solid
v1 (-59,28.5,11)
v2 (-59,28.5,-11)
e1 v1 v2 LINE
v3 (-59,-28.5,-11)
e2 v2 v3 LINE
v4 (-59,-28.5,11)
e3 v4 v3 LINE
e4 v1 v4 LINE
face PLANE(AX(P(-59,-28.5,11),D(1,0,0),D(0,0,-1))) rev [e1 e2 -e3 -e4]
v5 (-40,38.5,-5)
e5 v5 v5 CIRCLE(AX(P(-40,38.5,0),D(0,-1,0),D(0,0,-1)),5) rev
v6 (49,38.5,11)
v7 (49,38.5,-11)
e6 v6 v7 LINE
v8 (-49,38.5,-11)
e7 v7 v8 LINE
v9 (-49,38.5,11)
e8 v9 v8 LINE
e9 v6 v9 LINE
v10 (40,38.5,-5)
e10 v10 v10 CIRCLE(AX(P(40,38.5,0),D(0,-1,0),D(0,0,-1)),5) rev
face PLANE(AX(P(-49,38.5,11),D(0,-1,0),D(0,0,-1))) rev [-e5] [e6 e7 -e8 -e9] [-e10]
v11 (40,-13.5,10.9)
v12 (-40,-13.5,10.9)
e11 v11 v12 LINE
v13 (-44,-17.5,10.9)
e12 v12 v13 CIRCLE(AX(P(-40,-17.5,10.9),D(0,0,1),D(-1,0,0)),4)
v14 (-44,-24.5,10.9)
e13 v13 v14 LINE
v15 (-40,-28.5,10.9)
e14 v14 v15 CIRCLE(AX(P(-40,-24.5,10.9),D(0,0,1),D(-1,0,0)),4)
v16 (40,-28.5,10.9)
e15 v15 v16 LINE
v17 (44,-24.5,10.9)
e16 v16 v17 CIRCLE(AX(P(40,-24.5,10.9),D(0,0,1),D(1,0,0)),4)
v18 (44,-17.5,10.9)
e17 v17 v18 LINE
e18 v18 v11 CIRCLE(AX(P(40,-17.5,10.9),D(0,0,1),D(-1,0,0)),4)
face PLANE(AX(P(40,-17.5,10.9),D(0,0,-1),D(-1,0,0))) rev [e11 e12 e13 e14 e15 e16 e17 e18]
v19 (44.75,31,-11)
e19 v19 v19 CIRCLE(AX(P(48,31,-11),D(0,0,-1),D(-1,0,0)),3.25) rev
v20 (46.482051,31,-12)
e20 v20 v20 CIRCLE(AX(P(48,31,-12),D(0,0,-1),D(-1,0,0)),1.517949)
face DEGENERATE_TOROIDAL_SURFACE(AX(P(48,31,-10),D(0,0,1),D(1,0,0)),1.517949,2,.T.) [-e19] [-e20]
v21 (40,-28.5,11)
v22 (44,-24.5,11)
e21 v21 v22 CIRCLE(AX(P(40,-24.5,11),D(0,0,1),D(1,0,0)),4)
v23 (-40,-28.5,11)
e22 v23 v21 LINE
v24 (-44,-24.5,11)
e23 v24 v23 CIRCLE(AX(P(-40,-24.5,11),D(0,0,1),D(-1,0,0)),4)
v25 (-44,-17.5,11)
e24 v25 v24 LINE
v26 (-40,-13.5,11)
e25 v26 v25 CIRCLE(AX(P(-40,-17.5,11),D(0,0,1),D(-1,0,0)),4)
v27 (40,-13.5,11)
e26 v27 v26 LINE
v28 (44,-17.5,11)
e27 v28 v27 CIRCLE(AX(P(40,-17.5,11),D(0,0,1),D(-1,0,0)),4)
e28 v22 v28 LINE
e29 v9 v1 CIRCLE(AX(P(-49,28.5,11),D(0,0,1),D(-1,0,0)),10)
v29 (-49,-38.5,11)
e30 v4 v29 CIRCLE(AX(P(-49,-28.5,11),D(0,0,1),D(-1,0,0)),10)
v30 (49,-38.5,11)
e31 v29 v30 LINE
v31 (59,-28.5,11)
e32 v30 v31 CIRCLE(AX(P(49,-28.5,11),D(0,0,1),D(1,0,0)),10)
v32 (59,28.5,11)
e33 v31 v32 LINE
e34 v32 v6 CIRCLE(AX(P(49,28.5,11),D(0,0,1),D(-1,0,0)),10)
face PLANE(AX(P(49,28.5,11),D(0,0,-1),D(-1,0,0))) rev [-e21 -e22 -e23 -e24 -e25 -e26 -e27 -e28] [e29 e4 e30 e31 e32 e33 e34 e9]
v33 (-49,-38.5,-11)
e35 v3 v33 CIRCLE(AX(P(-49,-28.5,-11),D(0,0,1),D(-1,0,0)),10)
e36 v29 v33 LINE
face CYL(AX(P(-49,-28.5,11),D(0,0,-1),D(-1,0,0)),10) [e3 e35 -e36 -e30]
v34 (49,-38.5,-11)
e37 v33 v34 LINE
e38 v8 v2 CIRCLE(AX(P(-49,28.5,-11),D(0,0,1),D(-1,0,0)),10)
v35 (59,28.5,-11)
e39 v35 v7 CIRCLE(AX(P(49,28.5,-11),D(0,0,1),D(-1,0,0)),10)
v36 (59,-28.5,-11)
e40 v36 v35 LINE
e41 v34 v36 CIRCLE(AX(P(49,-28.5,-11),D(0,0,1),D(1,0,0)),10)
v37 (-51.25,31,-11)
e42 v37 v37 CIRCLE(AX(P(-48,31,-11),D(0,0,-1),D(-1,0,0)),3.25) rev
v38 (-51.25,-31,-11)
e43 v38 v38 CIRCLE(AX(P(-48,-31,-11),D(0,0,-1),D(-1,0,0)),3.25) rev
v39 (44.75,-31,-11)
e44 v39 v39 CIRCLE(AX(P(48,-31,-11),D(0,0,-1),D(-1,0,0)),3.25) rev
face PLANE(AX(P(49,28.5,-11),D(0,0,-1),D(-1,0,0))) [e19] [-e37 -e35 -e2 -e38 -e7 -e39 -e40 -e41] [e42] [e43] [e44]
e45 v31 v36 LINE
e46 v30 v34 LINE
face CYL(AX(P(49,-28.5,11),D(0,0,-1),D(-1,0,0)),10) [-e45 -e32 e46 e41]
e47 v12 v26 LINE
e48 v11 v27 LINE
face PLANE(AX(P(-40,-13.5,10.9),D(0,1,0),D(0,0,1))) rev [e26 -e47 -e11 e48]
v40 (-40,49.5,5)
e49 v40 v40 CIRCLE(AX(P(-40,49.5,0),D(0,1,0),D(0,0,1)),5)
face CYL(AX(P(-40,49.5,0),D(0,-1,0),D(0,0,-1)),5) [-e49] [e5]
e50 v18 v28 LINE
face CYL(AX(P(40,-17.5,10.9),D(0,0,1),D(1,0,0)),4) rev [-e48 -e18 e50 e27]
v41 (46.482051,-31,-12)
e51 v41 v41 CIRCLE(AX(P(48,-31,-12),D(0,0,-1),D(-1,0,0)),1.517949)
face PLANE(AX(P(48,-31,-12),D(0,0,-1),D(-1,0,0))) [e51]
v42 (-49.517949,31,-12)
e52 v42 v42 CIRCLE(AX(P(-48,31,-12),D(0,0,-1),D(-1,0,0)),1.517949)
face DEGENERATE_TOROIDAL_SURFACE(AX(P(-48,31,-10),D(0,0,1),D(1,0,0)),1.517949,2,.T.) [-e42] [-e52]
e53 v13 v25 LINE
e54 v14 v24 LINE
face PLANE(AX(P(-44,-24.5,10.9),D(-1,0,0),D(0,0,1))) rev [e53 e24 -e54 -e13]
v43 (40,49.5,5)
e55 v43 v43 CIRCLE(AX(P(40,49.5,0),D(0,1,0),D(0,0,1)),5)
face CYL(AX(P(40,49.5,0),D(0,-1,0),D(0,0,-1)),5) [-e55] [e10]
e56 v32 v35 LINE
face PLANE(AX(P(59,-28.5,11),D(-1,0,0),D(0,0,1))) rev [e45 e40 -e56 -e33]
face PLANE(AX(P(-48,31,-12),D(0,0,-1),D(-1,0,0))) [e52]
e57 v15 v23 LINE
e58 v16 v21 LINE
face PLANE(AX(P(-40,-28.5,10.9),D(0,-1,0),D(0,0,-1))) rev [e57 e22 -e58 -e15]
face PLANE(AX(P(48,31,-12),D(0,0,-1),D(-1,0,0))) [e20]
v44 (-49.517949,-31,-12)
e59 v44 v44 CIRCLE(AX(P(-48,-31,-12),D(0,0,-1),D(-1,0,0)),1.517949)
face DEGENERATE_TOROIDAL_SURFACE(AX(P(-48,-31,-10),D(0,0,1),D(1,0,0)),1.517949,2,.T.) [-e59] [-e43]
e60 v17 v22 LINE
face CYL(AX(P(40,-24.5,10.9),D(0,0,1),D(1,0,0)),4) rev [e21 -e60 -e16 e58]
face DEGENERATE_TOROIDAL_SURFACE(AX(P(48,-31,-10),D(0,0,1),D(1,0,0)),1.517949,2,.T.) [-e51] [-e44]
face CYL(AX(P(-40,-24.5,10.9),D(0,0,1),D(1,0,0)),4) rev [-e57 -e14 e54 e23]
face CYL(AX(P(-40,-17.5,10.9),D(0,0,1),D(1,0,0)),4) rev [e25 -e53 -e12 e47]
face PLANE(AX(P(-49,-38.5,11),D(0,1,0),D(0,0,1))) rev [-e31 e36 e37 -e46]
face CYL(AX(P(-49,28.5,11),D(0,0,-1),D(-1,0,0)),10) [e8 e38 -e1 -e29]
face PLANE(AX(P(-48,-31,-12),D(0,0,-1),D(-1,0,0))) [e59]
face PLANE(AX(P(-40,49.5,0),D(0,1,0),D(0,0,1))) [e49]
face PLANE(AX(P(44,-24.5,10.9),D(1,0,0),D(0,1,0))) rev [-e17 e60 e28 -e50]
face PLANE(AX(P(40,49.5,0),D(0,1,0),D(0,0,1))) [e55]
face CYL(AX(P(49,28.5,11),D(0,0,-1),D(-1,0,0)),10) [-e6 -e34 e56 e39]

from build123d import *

# Parameters (mm, degrees)
BOSS_EXTRUDE1_DEPTH = 11
SKETCH2_R           = 5
BOSS_EXTRUDE2_DEPTH = 11
SKETCH3_R           = 3.25
BOSS_EXTRUDE3_DEPTH = 1
FILLET1_R           = 2
CUT_EXTRUDE1_DEPTH  = 0.1


with BuildPart() as part:
    # Sketch1 → Boss-Extrude1 (new, symmetric)
    with BuildSketch(Plane.XY):
        with BuildLine():
            Line((-49, -38.5), (49, -38.5))
            ThreePointArc((49, -38.5), (56.071067812, -35.571067812), (59, -28.5))
            Line((59, -28.5), (59, 28.5))
            ThreePointArc((59, 28.5), (56.071067812, 35.571067812), (49, 38.5))
            Line((49, 38.5), (-49, 38.5))
            ThreePointArc((-49, 38.5), (-56.071067812, 35.571067812), (-59, 28.5))
            Line((-59, 28.5), (-59, -28.5))
            ThreePointArc((-59, -28.5), (-56.071067812, -35.571067812), (-49, -38.5))
        make_face()
    extrude(amount=BOSS_EXTRUDE1_DEPTH, both=True)

    # Sketch2 → Boss-Extrude2 (add, symmetric)
    with BuildSketch(Plane(origin=(0, 38.5, 0), x_dir=(1, 0, 0), z_dir=(0, 1, 0))):
        with Locations(Location((-40, 0, 0), (0, 0, 90))):
            Circle(SKETCH2_R)
        with Locations(Location((40, 0, 0), (0, 0, 90))):
            Circle(SKETCH2_R)
    extrude(amount=BOSS_EXTRUDE2_DEPTH, both=True)

    # Sketch3 → Boss-Extrude3 (add, symmetric)
    with BuildSketch(Plane(origin=(0, 0, -11), x_dir=(-1, 0, 0), z_dir=(0, 0, -1))):
        with Locations((-48, 31)):
            Circle(SKETCH3_R)
        with Locations((-48, -31)):
            Circle(SKETCH3_R)
        with Locations((48, -31)):
            Circle(SKETCH3_R)
        with Locations((48, 31)):
            Circle(SKETCH3_R)
    extrude(amount=BOSS_EXTRUDE3_DEPTH, both=True)

    # Fillet1
    # the kernel refuses this fillet: 2 mm, written as the material it takes off along each edge
    with BuildSketch(Plane(origin=(48, 31, -12), x_dir=(-1, 0, 0), z_dir=(0, -1, 0))) as fillet1_piece_1:
        with BuildLine():
            CenterArc((1.517949192, -2), FILLET1_R, 30, 60)
            Line((1.517949192, 0), (1.517949192, 0.04))
            Line((1.517949192, 0.04), (3.25, 0.04))
            Line((3.25, 0.04), (3.29, 0))
            ThreePointArc((3.29, 0), (3.29, -0.5), (3.284641016, -0.98))
            Line((3.284641016, -0.98), (3.25, -1))
        make_face()
    revolve(axis=Axis((48, 31, -12), (0, 0, -1)), mode=Mode.SUBTRACT)
    with BuildSketch(Plane(origin=(48, -31, -12), x_dir=(-1, 0, 0), z_dir=(0, -1, 0))) as fillet1_piece_2:
        with BuildLine():
            CenterArc((1.517949192, -2), FILLET1_R, 30, 60)
            Line((1.517949192, 0), (1.517949192, 0.04))
            Line((1.517949192, 0.04), (3.25, 0.04))
            Line((3.25, 0.04), (3.29, 0))
            ThreePointArc((3.29, 0), (3.29, -0.5), (3.284641016, -0.98))
            Line((3.284641016, -0.98), (3.25, -1))
        make_face()
    revolve(axis=Axis((48, -31, -12), (0, 0, -1)), mode=Mode.SUBTRACT)
    with BuildSketch(Plane(origin=(-48, -31, -12), x_dir=(-1, 0, 0), z_dir=(0, -1, 0))) as fillet1_piece_3:
        with BuildLine():
            CenterArc((1.517949192, -2), FILLET1_R, 30, 60)
            Line((1.517949192, 0), (1.517949192, 0.04))
            Line((1.517949192, 0.04), (3.25, 0.04))
            Line((3.25, 0.04), (3.29, 0))
            ThreePointArc((3.29, 0), (3.29, -0.5), (3.284641016, -0.98))
            Line((3.284641016, -0.98), (3.25, -1))
        make_face()
    revolve(axis=Axis((-48, -31, -12), (0, 0, -1)), mode=Mode.SUBTRACT)
    with BuildSketch(Plane(origin=(-48, 31, -12), x_dir=(-1, 0, 0), z_dir=(0, -1, 0))) as fillet1_piece_4:
        with BuildLine():
            CenterArc((1.517949192, -2), FILLET1_R, 30, 60)
            Line((1.517949192, 0), (1.517949192, 0.04))
            Line((1.517949192, 0.04), (3.25, 0.04))
            Line((3.25, 0.04), (3.29, 0))
            ThreePointArc((3.29, 0), (3.29, -0.5), (3.284641016, -0.98))
            Line((3.284641016, -0.98), (3.25, -1))
        make_face()
    revolve(axis=Axis((-48, 31, -12), (0, 0, -1)), mode=Mode.SUBTRACT)

    # Sketch4 → Cut-Extrude1 (cut)
    with BuildSketch(Plane.XY.offset(11)):
        with BuildLine():
            Line((-40, -28.5), (40, -28.5))
            ThreePointArc((40, -28.5), (42.828427125, -27.328427125), (44, -24.5))
            Line((44, -24.5), (44, -17.5))
            ThreePointArc((44, -17.5), (42.828427125, -14.671572875), (40, -13.5))
            Line((40, -13.5), (-40, -13.5))
            ThreePointArc((-40, -13.5), (-42.828427125, -14.671572875), (-44, -17.5))
            Line((-44, -17.5), (-44, -24.5))
            ThreePointArc((-44, -24.5), (-42.828427125, -27.328427125), (-40, -28.5))
        make_face()
    extrude(amount=-CUT_EXTRUDE1_DEPTH, mode=Mode.SUBTRACT)


solid = part.part
